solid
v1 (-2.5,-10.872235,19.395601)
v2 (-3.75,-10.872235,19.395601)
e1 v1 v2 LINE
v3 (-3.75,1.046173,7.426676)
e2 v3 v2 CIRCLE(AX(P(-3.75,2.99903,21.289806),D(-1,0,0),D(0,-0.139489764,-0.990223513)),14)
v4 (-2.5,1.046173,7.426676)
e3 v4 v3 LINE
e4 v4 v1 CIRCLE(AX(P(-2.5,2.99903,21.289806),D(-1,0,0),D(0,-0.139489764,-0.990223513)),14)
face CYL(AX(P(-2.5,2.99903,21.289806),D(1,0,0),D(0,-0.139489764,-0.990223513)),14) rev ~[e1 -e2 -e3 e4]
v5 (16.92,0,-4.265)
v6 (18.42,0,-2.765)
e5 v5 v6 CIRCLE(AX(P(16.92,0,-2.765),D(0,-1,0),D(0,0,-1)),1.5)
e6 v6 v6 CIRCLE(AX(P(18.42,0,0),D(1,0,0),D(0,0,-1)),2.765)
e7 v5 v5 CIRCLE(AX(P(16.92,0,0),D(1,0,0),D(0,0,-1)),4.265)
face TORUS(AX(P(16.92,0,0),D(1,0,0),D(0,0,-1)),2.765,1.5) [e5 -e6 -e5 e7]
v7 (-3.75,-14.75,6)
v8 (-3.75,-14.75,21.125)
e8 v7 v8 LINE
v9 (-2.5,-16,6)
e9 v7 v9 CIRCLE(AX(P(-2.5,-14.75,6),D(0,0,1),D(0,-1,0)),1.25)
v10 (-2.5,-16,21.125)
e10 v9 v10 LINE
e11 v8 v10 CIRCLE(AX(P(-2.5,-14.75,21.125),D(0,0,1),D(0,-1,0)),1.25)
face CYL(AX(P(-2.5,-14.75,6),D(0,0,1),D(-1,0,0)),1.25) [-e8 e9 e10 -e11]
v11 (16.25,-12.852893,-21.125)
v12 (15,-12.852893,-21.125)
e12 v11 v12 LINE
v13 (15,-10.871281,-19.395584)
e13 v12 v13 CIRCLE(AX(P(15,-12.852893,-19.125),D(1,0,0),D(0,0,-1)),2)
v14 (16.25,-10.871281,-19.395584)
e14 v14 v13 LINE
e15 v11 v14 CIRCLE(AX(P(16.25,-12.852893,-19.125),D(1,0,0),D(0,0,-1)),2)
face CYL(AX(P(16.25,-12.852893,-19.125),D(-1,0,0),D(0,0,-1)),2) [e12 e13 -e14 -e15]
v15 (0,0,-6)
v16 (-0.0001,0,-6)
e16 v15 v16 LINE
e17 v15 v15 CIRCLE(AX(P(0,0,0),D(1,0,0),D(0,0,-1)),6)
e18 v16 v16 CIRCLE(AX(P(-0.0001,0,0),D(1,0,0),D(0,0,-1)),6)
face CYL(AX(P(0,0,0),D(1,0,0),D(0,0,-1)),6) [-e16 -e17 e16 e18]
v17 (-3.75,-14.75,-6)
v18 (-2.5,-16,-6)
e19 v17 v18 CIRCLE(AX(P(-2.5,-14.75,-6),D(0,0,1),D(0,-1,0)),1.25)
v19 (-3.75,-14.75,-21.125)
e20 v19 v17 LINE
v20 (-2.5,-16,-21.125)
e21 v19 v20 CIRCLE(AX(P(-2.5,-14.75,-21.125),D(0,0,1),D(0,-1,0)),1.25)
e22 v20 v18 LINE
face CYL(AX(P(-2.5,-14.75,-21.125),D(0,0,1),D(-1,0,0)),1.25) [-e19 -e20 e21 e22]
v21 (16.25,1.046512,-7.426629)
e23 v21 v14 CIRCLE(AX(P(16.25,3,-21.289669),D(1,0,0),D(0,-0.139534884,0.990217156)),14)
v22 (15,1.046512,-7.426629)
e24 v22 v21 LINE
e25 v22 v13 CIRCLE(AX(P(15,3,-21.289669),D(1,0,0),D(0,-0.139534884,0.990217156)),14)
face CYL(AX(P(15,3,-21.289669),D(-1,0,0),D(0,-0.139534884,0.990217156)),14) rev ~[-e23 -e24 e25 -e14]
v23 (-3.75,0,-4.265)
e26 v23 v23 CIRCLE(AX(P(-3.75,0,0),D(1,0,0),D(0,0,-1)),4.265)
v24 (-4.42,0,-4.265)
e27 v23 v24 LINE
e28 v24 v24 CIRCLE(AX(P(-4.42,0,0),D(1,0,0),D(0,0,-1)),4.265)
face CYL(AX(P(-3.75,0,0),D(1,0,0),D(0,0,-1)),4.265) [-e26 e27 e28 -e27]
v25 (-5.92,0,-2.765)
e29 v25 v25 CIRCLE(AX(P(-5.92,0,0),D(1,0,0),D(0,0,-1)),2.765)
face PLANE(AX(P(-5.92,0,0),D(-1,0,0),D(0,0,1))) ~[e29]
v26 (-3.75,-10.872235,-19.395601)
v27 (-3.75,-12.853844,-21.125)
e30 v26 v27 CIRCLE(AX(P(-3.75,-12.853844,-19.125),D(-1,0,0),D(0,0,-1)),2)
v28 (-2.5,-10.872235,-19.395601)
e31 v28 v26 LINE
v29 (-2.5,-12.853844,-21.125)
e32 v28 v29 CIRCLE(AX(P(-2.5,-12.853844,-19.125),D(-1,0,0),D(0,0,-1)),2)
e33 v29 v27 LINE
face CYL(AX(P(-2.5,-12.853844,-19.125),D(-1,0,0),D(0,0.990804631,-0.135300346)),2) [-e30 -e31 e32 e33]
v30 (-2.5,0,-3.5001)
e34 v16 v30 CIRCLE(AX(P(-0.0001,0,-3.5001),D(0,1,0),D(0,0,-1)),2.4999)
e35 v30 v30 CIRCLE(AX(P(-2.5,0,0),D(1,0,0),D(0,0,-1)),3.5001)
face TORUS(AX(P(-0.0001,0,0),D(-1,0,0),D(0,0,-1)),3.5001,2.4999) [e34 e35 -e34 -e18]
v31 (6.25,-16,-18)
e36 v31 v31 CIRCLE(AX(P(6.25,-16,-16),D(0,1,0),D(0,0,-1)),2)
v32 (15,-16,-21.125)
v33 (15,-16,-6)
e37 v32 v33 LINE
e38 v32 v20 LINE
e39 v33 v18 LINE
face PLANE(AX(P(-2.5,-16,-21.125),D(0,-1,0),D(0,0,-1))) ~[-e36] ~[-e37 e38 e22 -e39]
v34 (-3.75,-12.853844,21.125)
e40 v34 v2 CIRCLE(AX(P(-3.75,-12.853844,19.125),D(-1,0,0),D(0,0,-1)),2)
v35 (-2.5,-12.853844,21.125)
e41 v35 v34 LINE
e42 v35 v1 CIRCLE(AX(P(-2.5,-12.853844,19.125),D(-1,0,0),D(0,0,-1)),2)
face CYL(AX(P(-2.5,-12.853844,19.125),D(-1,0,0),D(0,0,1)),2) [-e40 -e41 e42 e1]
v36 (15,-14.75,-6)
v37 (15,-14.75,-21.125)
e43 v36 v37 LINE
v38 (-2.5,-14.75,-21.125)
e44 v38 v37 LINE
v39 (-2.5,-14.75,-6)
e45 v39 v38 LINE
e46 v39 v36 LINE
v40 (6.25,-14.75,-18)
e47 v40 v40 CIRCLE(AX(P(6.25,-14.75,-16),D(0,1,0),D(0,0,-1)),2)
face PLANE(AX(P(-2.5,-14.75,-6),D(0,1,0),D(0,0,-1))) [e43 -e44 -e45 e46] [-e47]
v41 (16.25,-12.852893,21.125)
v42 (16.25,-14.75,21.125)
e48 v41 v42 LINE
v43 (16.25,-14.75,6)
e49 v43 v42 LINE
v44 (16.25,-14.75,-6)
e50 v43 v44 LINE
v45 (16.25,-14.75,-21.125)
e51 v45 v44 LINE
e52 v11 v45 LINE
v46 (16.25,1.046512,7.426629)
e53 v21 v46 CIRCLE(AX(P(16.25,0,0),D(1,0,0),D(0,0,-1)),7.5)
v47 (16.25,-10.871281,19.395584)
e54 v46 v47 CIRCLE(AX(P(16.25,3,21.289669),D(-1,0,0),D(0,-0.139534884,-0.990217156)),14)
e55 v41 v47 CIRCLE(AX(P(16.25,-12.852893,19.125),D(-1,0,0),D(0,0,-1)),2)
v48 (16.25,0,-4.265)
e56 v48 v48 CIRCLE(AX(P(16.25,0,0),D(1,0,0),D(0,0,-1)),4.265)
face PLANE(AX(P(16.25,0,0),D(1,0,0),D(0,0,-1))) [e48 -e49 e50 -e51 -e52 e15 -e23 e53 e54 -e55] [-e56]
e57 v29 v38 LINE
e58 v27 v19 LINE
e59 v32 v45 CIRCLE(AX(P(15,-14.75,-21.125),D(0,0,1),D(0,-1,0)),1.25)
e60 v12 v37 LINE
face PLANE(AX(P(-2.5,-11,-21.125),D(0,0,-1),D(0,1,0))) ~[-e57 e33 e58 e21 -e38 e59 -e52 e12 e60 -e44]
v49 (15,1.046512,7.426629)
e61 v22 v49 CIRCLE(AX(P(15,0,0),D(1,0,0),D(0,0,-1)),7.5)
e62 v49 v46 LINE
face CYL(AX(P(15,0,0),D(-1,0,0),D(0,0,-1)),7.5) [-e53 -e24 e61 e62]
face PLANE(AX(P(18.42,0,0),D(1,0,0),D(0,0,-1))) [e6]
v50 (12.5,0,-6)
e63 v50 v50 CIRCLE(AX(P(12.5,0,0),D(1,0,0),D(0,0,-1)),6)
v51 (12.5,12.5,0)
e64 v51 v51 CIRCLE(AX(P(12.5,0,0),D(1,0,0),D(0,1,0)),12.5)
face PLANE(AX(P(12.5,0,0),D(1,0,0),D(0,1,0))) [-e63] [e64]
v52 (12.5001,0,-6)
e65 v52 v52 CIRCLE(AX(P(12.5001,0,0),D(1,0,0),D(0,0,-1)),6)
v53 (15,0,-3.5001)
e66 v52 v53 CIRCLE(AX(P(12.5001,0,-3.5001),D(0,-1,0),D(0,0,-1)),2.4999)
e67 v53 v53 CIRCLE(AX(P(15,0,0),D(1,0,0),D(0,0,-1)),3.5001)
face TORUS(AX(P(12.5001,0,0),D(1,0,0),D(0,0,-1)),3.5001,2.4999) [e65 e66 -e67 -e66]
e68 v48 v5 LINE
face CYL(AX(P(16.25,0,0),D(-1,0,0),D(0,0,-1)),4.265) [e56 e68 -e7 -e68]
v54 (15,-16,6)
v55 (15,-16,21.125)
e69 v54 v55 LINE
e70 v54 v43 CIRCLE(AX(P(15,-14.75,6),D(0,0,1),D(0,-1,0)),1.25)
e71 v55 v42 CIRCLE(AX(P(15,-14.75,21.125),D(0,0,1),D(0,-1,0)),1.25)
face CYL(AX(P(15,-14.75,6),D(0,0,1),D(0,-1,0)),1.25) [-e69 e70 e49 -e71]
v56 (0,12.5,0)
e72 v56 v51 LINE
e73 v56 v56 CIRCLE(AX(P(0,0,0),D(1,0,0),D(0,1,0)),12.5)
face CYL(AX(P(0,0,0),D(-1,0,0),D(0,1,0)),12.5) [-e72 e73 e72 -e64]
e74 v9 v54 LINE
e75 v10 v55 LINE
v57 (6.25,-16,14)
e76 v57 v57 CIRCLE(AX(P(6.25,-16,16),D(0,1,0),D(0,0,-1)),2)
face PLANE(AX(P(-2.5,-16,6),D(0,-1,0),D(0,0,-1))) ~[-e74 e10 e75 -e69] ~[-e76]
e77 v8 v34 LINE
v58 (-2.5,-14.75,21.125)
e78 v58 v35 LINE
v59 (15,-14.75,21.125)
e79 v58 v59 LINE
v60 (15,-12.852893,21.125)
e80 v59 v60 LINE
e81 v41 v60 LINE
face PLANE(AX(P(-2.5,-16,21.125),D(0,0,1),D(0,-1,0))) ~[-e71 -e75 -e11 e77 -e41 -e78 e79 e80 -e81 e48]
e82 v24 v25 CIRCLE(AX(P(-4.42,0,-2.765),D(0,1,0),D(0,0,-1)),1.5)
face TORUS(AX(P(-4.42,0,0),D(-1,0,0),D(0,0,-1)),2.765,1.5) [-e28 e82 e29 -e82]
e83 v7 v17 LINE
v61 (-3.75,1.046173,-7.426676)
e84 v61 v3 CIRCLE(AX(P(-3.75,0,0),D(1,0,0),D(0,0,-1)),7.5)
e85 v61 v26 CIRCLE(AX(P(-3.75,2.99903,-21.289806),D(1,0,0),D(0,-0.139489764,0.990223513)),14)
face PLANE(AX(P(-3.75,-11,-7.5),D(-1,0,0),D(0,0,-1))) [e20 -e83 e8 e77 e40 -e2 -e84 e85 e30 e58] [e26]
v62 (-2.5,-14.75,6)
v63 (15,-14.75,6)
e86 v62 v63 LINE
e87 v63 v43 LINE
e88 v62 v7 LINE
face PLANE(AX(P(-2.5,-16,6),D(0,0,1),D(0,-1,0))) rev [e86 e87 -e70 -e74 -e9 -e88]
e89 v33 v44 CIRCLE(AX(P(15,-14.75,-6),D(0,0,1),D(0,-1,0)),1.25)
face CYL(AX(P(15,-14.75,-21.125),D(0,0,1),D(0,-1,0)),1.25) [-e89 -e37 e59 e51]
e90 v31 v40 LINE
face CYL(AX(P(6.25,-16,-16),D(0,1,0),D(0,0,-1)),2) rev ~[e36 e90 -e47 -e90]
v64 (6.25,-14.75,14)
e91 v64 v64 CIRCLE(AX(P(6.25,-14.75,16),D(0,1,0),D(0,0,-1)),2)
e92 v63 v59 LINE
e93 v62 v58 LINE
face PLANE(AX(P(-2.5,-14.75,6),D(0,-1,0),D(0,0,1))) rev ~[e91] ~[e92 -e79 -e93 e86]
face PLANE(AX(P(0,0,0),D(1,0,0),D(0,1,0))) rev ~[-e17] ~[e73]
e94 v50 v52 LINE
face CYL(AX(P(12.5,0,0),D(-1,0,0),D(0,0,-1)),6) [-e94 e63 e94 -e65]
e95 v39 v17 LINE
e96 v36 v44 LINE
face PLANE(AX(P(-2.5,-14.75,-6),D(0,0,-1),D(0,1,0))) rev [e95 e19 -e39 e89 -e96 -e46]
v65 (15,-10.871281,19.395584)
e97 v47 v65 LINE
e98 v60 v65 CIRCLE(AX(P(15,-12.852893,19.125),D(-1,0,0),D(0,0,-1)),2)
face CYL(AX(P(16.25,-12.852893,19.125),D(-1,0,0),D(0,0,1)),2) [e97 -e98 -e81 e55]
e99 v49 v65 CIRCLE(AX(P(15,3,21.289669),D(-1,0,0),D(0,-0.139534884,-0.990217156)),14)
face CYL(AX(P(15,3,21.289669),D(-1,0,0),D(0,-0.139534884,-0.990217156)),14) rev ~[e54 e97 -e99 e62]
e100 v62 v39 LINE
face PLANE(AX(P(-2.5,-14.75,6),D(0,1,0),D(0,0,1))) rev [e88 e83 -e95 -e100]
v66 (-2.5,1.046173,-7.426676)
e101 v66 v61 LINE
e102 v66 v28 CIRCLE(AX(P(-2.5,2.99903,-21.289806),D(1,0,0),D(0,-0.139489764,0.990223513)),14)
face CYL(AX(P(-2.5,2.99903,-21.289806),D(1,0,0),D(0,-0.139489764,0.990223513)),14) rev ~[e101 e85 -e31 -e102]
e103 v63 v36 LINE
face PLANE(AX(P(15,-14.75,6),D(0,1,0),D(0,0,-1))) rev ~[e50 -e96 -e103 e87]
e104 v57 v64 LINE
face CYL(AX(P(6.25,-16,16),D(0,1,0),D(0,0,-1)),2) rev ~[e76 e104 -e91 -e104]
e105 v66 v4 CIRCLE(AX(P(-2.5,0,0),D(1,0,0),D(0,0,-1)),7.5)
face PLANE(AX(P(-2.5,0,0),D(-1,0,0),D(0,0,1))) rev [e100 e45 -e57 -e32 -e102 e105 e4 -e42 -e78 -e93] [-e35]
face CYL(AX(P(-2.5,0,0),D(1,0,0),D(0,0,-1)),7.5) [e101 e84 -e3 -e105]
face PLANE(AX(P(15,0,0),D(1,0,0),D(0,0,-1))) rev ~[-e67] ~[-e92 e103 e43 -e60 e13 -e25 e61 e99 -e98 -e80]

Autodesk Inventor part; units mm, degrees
ref_plane "YZ Plane" through (0, 0, 0) normal (1, 0, 0) x (0, 1, 0)
ref_plane "XZ Plane" through (0, 0, 0) normal (0, 1, 0) x (-1, 0, 0)
sketch "Sketch1" plane through (0, 0, 0) normal (1, 0, 0) x (0, 1, 0)
  circle A0 centre (0, 0) radius 12.5
  dimension "d0" = 25
extrude "Extrusion1" add sketch "Sketch1" along normal blind 12.5
ref_plane "Work Plane1" through (6.25, 0, 0) normal (-1, 0, 0) x (0, 0, 1)
sketch "Sketch2" plane through (12.5, 0, 0) normal (1, 0, 0) x (0, 0, -1)
  circle A0 centre (0, 0) radius 6
  dimension "d3" = 12
extrude "Extrusion2" add sketch "Sketch2" along normal blind 2.5
fillet "Fillet1" radius 2.5 1 edges at (15, 0, 6)
sketch "Sketch3" plane through (15, 0, 0) normal (1, 0, 0) x (0, 0, -1)
  circle A0 centre (0, 0) radius 7.5
  line L0 (-21.125, -11) -> (21.125, -11)
  line L1 (21.125, -11) -> (21.125, -16)
  line L2 (21.125, -16) -> (-21.125, -16)
  line L3 (-21.125, -16) -> (-21.125, -11)
  line L4 (-7.5, 0) -> (7.5, 0)
  line L5 (7.5, 0) -> (7.5, -11)
  line L6 (7.5, -11) -> (-7.5, -11)
  line L7 (-7.5, -11) -> (-7.5, 0)
  line L8 (6, -16) -> (-6, -16)
  line L9 (-6, -16) -> (-6, -14.75)
  line L10 (-6, -14.75) -> (6, -14.75)
  line L11 (6, -14.75) -> (6, -16)
  dimension "d7" = 15
  dimension "d8" = 16
  dimension "d9" = 5
  dimension "d10" = 42.25
  dimension "d11" = 21.125
  dimension "d21" = 12
  dimension "d22" = 6
  dimension "d23" = 1.25
extrude "Extrusion3" add sketch "Sketch3" along normal blind 1.25 contours L4 A0 | L5 L0 L7 A0 | A0 L4 | L0 L1 L2 L11 L10 L9 L3
fillet "Fillet2" radius 14 2 edges at (15.625, -11, -7.5) (15.625, -11, 7.5)
fillet "Fillet3" radius 2 2 edges at (15.625, -10.999, 21.125) (15.625, -10.999, -21.125)
sketch "Sketch5" plane through (16.25, 0, 0) normal (1, 0, 0) x (0, 0, -1)
  circle A0 centre (0, 0) radius 4.265
  dimension "d25" = 8.53
extrude "Extrusion5" add sketch "Sketch5" along normal blind 2.17
fillet "Fillet5" radius 1.5 1 edges at (18.42, 0, 4.265)
mirror "Mirror1" about plane through (6.25, 0, 0) normal (-1, 0, 0) of "Extrusion2", "Fillet1", "Extrusion3", "Fillet2", "Fillet3", "Extrusion5", "Fillet5"
sketch "Sketch4" plane through (-2.5, -16, 21.125) normal (1, 0, 0) x (0, 0, -1)
  line L0 (0, 0) -> (42.25, 0) projected
  line L1 (42.25, 0) -> (27.125, 0)
  line L2 (27.125, 0) -> (27.125, 1.25)
  line L3 (27.125, 1.25) -> (42.25, 1.25)
  line L4 (42.25, 1.25) -> (42.25, 0)
  line L5 (0, 0) -> (42.25, 0) projected
  line L6 (0, 0) -> (15.125, 0)
  line L7 (15.125, 0) -> (15.125, 1.25)
  line L8 (15.125, 1.25) -> (0, 1.25)
  line L9 (0, 1.25) -> (0, 0)
  point P0 (21.125, 16)
  point P1 (15.125, 0)
  point P2 (27.125, 0)
  point P3 (27.125, 1.25)
  point P4 (15.125, 1.25)
  dimension "d16" = 1.25
extrude "Extrusion4" add sketch "Sketch4" along normal up to surface (17.5 mm away)
fillet "Fillet4" radius 1.25 4 edges at (-3.75, -16, -13.5625) (16.25, -16, -13.5625) (16.25, -16, 13.5625) (-3.75, -16, 13.5625)
sketch "Sketch6" plane through (-2.5, -16, 6) normal (0, -1, 0) x (1, 0, 0)
  line L0 (0, 15.125) -> (17.5, 15.125) projected
  point P0 (2.5, -6)
  point P1 (8.75, 10)
  point P2 (8.75, -22)
  point P3 (8.75, 15.125)
  dimension "d29" = 32
  dimension "d30" = 16
hole "Hole1" at (6.25, -16, 16) at (6.25, -16, -16) direction (0, 1, 0) diameter 4 end through all
equation "\"d11\" = 0.5 * d10"
equation "\"d22\" = 0.5 * d21"
equation "\"d30\" = 0.5 * d29"
properties part number "caster_d25"
